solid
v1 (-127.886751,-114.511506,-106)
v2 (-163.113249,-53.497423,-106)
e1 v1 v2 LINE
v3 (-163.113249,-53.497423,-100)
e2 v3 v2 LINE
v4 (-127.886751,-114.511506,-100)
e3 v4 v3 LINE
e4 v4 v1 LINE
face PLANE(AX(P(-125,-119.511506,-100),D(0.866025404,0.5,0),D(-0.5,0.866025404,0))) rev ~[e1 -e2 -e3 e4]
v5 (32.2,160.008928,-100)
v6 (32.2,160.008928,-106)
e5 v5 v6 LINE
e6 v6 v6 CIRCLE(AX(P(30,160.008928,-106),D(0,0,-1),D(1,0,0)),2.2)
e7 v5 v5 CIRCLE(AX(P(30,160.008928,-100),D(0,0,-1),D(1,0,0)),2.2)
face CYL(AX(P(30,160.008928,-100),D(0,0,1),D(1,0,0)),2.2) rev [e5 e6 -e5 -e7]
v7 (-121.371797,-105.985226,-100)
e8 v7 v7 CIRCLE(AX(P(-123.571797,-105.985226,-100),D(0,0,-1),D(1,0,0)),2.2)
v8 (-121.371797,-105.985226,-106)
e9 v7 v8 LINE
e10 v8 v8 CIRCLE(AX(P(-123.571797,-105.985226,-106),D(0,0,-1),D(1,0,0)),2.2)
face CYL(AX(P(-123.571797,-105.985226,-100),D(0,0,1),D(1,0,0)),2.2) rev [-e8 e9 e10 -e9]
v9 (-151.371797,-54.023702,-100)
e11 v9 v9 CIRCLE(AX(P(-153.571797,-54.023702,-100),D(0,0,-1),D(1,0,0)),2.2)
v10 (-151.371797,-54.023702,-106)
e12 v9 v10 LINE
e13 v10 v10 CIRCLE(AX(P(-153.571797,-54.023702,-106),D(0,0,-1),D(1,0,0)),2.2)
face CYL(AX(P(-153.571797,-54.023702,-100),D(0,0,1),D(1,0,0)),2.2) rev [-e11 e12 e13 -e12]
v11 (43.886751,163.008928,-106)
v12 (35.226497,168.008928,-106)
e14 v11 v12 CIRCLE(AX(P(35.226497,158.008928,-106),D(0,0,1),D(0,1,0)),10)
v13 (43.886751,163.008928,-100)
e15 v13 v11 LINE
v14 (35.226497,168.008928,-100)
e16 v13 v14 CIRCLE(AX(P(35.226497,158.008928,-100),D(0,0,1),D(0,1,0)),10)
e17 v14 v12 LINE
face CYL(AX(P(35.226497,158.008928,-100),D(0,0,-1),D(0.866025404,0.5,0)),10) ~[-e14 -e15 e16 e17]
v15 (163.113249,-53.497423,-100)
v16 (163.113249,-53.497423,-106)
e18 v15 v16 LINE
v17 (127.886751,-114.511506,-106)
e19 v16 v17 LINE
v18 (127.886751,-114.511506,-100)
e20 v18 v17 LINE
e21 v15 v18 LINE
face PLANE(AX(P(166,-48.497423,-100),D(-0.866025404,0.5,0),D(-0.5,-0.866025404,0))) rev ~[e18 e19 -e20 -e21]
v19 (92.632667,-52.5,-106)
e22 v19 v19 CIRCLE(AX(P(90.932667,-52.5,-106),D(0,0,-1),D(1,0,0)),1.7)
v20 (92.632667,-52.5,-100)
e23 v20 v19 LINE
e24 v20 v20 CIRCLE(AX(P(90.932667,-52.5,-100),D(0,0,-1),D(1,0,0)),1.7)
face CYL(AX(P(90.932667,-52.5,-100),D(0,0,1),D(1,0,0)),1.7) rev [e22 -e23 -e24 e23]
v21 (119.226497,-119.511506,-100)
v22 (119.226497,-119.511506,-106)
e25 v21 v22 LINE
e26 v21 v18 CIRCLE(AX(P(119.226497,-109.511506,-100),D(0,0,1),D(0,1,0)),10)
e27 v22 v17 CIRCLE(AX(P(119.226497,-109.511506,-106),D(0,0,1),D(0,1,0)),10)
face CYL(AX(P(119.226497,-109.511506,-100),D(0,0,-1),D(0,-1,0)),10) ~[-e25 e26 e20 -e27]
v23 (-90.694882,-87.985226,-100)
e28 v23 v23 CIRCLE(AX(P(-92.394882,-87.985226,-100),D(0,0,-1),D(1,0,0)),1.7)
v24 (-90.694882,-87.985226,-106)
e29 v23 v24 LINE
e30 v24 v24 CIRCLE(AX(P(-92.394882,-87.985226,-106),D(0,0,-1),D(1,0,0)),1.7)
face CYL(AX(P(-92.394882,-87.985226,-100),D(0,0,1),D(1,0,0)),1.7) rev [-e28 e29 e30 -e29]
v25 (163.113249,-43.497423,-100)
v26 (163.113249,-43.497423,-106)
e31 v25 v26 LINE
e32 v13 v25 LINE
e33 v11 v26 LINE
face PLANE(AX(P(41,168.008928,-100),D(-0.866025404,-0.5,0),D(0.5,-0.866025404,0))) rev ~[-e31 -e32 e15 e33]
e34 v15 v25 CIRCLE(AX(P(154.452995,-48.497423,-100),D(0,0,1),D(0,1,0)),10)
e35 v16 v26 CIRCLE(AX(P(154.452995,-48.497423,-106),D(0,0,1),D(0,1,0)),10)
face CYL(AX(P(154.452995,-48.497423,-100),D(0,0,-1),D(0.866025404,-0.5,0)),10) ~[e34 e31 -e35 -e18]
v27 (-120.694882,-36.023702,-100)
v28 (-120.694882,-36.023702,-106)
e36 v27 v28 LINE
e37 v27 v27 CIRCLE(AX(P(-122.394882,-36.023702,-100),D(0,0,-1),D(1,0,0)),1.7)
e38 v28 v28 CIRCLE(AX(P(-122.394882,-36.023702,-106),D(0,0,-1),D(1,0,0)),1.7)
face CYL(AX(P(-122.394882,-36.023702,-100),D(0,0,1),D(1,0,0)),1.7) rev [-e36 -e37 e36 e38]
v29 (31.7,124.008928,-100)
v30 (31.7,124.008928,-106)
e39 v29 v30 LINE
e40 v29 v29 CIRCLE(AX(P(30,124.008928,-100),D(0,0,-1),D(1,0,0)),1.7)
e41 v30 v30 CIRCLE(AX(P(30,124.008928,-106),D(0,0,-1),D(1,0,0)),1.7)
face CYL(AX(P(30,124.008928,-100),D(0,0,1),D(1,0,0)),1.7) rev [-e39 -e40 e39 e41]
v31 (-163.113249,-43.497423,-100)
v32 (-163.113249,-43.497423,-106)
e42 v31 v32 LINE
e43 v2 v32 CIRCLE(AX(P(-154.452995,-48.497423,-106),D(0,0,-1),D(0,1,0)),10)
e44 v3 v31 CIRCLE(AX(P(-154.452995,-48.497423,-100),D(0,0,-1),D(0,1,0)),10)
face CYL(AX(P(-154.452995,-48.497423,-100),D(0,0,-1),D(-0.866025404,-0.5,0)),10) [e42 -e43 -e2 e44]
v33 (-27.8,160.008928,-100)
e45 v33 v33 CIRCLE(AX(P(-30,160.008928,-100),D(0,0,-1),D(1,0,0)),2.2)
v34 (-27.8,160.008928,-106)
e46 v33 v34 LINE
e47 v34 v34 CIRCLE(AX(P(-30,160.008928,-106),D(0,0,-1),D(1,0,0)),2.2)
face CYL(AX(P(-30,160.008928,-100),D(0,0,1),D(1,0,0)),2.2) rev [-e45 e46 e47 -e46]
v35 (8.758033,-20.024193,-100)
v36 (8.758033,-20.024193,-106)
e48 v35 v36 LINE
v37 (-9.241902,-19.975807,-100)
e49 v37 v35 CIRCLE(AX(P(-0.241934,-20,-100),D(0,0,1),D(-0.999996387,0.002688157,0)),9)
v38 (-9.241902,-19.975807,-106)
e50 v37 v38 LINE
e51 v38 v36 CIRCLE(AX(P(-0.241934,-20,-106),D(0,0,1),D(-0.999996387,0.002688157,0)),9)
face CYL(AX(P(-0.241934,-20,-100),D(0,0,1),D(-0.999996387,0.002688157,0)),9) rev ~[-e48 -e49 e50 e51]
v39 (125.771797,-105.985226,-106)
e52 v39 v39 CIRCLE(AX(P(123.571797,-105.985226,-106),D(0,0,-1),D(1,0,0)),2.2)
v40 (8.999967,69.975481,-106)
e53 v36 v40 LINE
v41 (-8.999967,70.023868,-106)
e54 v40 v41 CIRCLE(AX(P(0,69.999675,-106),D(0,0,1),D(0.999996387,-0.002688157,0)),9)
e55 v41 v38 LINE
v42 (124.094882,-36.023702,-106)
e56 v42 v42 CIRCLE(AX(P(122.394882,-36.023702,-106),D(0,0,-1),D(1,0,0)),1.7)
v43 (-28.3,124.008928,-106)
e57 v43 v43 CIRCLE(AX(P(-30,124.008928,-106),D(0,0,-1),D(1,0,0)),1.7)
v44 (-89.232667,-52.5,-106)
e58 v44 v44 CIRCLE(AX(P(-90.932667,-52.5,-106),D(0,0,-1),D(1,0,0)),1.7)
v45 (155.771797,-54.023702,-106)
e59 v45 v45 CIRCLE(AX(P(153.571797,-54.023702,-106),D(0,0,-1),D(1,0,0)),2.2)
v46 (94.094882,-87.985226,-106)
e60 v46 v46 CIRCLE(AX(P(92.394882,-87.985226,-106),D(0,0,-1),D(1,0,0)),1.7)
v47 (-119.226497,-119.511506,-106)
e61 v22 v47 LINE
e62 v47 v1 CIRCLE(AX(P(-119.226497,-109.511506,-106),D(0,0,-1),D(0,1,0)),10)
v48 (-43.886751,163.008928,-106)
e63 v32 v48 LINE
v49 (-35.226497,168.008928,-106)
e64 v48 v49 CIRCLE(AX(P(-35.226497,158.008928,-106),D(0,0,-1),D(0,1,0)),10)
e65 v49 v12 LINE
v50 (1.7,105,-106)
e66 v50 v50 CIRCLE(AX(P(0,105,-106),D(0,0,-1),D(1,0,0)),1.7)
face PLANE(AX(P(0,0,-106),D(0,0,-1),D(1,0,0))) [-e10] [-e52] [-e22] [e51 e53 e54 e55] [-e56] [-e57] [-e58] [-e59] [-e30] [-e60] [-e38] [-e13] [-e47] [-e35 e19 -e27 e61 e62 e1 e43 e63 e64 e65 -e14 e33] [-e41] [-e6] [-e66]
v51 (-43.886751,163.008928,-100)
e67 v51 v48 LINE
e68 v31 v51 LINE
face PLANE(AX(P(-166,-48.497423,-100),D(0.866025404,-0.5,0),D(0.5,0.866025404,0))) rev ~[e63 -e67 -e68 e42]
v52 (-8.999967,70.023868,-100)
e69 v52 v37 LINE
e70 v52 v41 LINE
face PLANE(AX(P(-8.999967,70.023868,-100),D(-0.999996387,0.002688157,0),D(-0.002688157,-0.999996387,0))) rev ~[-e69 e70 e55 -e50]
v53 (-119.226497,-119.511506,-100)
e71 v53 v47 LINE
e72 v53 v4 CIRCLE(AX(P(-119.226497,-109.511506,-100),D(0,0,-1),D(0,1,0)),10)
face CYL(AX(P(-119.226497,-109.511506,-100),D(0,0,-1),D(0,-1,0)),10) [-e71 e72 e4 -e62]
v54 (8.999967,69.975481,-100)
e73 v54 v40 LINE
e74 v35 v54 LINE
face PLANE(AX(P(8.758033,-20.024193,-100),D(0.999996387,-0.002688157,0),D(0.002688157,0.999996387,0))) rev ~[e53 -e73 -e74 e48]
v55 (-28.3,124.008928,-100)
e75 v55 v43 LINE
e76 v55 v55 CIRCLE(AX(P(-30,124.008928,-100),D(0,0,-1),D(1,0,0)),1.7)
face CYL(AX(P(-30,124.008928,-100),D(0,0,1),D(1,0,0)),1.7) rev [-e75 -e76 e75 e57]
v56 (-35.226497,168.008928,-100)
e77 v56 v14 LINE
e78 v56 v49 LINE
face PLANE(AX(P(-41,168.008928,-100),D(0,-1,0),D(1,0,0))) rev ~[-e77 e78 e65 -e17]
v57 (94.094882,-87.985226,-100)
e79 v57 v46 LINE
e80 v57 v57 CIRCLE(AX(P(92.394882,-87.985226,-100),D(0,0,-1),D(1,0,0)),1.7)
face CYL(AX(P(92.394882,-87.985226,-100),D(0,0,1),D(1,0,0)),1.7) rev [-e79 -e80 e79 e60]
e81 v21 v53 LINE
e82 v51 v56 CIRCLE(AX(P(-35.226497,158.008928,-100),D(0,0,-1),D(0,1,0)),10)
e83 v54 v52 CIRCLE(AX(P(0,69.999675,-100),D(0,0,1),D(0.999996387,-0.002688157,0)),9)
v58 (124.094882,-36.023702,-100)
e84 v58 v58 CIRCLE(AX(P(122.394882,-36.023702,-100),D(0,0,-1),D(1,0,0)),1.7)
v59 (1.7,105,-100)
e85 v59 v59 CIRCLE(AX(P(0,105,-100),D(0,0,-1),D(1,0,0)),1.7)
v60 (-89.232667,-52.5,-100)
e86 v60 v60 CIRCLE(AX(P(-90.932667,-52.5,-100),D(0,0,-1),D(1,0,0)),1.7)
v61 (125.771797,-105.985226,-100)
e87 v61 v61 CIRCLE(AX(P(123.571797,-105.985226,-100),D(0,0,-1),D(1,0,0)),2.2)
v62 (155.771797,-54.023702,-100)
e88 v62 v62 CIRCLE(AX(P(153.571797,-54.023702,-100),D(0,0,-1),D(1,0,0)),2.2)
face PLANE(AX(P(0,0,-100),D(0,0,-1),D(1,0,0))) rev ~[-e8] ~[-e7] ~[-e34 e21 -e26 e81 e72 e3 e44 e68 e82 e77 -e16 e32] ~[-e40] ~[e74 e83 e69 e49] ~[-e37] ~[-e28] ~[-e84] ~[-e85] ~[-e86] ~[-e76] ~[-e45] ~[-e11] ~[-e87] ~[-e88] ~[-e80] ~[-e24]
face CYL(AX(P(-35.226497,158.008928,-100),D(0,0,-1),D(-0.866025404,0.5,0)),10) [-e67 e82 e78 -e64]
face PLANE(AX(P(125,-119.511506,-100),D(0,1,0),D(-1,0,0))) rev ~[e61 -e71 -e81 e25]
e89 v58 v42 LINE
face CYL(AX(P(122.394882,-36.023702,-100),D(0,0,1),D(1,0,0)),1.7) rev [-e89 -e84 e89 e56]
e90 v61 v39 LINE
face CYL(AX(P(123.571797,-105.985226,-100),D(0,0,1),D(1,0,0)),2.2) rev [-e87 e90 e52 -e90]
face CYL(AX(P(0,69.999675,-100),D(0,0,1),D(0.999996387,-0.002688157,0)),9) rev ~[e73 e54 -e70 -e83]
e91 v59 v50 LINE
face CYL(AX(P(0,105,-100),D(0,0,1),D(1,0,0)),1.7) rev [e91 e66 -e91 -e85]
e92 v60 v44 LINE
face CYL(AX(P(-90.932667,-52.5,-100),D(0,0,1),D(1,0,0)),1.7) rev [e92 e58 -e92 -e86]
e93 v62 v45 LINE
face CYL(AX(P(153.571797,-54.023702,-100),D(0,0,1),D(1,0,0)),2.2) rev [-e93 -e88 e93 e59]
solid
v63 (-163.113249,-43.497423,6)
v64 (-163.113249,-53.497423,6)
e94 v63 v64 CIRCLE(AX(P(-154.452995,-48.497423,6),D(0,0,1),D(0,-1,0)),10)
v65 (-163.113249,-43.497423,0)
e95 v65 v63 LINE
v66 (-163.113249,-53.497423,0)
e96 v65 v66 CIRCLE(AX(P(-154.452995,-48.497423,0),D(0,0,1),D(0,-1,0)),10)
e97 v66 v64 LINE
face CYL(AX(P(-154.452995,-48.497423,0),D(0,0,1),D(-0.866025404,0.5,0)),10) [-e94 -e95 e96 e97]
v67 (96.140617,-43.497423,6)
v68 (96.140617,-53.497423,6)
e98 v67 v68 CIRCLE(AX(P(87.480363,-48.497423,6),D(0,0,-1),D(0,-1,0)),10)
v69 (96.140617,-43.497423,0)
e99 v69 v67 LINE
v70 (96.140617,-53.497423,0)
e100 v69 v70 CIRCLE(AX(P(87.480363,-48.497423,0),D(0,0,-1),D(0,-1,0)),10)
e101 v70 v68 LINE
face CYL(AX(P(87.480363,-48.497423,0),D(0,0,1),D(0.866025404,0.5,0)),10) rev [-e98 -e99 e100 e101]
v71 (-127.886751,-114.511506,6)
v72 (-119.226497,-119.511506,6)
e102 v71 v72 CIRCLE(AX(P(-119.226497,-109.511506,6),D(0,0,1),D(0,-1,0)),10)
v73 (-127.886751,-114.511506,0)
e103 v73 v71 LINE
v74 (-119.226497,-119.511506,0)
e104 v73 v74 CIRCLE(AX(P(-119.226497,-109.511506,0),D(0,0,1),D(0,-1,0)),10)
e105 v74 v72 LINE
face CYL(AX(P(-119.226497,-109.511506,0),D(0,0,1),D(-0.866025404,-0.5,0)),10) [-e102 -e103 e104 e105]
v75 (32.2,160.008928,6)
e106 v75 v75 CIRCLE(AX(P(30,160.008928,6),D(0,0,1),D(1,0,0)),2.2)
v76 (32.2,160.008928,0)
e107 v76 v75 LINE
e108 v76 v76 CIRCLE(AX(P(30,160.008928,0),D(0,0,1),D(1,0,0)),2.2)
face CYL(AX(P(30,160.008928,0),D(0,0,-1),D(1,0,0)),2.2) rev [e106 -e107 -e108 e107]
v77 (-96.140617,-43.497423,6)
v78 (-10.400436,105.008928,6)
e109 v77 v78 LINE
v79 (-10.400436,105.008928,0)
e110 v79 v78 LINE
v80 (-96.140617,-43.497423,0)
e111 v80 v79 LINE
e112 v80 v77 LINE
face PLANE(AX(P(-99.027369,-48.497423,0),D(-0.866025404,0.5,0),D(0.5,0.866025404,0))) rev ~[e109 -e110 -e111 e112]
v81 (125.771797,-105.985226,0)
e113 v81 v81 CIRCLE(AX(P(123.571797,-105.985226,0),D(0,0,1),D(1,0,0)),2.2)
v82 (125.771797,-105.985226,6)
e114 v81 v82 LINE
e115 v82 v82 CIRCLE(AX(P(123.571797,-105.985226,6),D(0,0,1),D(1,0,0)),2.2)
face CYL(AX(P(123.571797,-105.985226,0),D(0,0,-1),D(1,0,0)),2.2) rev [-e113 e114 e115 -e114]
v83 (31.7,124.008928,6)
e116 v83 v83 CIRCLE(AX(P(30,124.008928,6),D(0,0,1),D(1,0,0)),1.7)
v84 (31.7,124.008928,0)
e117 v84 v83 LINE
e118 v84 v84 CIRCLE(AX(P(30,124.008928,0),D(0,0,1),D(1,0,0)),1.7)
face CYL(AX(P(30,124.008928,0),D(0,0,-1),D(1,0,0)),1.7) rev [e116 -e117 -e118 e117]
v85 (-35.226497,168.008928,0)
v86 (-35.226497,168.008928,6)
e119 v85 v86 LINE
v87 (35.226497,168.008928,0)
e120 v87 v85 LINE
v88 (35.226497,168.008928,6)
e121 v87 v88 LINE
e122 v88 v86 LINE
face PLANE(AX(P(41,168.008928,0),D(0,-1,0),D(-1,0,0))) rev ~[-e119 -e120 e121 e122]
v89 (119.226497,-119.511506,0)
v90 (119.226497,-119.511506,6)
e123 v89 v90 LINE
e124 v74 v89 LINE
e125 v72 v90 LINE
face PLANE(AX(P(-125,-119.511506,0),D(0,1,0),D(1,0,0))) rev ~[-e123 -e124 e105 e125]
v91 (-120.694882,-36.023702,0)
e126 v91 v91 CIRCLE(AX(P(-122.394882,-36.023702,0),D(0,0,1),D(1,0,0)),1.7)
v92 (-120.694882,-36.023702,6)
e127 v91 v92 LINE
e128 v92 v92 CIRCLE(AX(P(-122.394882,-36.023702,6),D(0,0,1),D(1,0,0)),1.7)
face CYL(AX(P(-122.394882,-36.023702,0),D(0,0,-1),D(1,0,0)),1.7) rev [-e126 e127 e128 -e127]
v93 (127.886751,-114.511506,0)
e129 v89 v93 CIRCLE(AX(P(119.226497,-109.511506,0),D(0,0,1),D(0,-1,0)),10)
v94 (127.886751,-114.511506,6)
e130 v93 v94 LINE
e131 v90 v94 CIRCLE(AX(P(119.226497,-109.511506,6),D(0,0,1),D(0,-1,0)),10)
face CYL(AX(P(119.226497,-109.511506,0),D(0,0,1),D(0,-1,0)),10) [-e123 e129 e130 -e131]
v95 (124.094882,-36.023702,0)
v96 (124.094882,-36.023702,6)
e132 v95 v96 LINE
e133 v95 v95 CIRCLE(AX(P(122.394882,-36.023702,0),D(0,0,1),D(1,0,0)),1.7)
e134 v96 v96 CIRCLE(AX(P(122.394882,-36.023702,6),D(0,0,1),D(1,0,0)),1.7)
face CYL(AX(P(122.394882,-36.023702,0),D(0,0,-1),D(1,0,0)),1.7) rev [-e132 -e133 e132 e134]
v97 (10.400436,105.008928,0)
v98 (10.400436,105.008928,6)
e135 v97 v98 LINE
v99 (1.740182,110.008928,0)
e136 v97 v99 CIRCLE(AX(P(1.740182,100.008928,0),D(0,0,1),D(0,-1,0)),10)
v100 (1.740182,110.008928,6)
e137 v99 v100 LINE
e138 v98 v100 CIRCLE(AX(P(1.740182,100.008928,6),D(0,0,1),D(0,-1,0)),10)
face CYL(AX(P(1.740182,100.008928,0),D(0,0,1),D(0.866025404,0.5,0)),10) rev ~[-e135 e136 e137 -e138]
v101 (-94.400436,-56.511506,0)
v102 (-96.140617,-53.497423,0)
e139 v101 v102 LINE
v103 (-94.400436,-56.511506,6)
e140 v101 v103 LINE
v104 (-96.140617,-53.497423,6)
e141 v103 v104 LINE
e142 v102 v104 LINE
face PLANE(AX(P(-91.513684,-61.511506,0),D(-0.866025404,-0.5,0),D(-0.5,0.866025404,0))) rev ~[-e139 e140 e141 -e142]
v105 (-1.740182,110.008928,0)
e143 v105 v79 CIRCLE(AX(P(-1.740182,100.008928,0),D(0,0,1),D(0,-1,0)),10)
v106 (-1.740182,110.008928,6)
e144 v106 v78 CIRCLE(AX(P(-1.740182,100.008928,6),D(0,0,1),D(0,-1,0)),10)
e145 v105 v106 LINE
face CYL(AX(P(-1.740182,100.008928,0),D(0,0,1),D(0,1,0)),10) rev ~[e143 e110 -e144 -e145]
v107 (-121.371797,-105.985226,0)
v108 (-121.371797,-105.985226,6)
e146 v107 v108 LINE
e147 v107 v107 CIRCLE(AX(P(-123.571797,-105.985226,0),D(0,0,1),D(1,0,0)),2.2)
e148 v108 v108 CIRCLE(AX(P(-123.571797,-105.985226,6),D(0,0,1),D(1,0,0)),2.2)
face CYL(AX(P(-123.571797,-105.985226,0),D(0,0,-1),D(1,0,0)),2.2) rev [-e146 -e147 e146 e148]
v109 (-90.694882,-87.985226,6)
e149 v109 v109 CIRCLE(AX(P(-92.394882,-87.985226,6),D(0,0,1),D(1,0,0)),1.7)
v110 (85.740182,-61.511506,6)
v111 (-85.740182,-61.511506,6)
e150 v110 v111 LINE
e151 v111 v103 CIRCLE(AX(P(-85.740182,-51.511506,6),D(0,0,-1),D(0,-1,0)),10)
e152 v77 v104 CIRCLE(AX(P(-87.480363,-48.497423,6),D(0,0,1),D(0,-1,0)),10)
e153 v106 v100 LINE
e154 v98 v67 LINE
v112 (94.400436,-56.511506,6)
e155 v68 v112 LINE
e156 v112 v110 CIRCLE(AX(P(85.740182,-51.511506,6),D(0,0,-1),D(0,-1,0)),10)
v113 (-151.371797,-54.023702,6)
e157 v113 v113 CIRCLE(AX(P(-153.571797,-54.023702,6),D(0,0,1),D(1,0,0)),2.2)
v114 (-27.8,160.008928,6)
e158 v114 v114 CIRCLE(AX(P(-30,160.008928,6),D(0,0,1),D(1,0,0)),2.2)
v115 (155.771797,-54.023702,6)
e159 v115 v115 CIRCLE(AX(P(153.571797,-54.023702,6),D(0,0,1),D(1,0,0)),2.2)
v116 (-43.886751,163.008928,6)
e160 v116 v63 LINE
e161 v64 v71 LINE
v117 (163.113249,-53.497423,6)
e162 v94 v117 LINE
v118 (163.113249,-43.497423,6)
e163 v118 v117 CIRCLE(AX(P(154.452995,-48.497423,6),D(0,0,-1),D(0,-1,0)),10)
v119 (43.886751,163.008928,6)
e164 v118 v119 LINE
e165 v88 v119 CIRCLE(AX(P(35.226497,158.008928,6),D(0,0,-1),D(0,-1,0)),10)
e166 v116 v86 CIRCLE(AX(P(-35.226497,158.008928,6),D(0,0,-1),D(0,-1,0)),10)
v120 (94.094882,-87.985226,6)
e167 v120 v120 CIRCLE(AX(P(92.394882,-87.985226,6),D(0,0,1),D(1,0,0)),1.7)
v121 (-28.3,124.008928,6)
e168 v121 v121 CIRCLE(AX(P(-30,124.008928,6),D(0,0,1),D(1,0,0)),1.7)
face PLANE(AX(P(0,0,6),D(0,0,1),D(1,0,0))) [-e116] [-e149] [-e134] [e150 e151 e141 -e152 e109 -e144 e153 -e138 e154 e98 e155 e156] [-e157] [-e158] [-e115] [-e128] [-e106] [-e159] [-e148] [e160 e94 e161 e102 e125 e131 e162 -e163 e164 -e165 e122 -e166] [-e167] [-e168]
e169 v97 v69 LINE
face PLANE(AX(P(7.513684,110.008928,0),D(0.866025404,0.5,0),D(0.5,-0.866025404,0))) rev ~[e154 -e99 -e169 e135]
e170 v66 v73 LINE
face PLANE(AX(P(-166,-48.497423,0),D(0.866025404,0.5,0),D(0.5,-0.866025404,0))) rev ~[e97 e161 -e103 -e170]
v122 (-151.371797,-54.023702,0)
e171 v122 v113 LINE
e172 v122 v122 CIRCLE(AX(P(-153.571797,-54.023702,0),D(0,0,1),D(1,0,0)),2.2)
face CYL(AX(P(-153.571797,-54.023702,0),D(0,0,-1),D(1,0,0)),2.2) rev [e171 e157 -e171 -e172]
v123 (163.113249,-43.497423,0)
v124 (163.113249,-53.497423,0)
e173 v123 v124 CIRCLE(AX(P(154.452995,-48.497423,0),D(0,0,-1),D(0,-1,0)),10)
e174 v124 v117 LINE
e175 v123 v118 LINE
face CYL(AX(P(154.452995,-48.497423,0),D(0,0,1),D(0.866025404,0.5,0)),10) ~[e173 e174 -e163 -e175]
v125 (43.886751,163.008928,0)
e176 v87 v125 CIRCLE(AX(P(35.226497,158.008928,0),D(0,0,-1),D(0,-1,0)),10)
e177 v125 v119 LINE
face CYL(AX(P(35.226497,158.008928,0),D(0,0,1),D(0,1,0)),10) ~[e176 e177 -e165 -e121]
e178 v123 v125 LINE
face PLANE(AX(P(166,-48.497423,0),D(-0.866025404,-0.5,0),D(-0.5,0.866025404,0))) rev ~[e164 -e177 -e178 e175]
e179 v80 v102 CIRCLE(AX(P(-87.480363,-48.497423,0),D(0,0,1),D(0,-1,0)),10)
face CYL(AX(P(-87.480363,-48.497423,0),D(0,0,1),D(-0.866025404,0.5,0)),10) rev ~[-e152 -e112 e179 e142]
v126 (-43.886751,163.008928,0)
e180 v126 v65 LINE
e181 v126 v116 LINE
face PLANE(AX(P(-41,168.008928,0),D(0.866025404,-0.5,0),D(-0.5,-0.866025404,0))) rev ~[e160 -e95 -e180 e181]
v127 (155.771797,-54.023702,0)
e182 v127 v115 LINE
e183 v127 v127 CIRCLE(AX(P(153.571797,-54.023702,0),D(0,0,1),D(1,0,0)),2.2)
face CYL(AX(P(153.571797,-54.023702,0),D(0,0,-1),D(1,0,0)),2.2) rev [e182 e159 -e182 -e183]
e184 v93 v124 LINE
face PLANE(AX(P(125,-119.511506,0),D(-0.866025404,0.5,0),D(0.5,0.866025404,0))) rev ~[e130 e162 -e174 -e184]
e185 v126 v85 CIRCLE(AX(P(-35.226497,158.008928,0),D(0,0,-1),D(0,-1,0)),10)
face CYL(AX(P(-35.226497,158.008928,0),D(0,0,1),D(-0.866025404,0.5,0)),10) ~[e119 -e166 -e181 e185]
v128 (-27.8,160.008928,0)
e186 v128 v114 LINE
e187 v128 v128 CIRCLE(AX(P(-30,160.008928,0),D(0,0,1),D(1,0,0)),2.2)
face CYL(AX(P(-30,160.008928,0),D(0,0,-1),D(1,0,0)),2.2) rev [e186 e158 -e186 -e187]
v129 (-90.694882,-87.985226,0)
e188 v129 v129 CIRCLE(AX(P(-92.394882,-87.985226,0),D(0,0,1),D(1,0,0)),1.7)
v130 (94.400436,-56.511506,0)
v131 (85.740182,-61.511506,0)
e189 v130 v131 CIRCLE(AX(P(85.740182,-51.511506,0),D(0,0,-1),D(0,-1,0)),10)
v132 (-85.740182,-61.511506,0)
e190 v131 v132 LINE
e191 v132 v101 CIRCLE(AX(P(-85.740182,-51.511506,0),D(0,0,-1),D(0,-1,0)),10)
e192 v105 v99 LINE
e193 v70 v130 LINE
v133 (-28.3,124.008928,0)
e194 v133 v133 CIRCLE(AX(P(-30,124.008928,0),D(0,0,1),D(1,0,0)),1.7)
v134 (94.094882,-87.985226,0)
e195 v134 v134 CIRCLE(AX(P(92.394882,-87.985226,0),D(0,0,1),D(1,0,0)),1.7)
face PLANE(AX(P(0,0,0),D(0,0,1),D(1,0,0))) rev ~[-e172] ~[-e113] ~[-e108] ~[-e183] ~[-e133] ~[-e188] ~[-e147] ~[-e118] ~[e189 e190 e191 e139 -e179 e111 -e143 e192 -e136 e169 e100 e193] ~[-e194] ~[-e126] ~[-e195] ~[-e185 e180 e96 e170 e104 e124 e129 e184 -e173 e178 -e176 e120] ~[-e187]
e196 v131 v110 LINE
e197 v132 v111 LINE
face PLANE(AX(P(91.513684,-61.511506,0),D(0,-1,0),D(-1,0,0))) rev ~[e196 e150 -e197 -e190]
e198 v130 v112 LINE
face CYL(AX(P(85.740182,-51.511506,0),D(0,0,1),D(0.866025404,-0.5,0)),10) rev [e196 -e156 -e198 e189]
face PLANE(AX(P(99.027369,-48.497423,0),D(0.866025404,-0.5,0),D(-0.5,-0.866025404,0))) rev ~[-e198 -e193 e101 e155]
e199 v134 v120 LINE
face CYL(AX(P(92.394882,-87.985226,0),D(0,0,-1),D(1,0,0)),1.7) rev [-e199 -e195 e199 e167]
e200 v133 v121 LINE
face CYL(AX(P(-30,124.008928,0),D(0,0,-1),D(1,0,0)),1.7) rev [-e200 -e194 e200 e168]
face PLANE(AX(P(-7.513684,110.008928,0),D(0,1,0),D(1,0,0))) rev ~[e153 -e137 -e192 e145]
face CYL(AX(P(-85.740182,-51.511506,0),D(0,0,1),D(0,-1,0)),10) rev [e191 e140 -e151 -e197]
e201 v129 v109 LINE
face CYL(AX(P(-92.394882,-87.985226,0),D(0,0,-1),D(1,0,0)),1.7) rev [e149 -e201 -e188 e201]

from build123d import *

# Parameters (mm, degrees)
F0_R     = 2.2
F0_R_2   = 1.7
F1_DEPTH = 6
F3_R     = 2.2
F3_R_2   = 1.7
F4_DEPTH = 6
F5_R     = 10
F5_2_R   = 10


# Not quite as in the source:
# - a feature names something its author has since deleted; it is built from what else it names


with BuildPart() as f1:
    # F0 (on Top) → F1 (new body)
    with BuildSketch(Plane.XY):
        Polygon((-41, 168.0089283342), (-166, -48.4974226119), (-125, -119.5115057223), (125, -119.5115057223), (166, -48.4974226119), (41, 168.0089283342), align=None)
        with Locations((-123.5717967697, -105.9852262806)):
            Circle(F0_R, mode=Mode.SUBTRACT)
        with Locations((-92.3948822335, -87.9852262806)):
            Circle(F0_R_2, mode=Mode.SUBTRACT)
        with Locations((-153.5717967697, -54.0237020536)):
            Circle(F0_R, mode=Mode.SUBTRACT)
        with Locations((-122.3948822335, -36.0237020536)):
            Circle(F0_R_2, mode=Mode.SUBTRACT)
        Polygon((99.027368774, -48.4974226119), (91.513684387, -61.5115057223), (-91.513684387, -61.5115057223), (-99.027368774, -48.4974226119), (-7.513684387, 110.0089283342), (7.513684387, 110.0089283342), align=None, mode=Mode.SUBTRACT)
        with Locations((123.5717967697, -105.9852262806)):
            Circle(F0_R, mode=Mode.SUBTRACT)
        with Locations((92.3948822335, -87.9852262806)):
            Circle(F0_R_2, mode=Mode.SUBTRACT)
        with Locations((153.5717967697, -54.0237020536)):
            Circle(F0_R, mode=Mode.SUBTRACT)
        with Locations((122.3948822335, -36.0237020536)):
            Circle(F0_R_2, mode=Mode.SUBTRACT)
        with Locations((-30, 124.0089283342)):
            Circle(F0_R_2, mode=Mode.SUBTRACT)
        with Locations((-30, 160.0089283342)):
            Circle(F0_R, mode=Mode.SUBTRACT)
        with Locations((30, 124.0089283342)):
            Circle(F0_R_2, mode=Mode.SUBTRACT)
        with Locations((30, 160.0089283342)):
            Circle(F0_R, mode=Mode.SUBTRACT)
    extrude(amount=F1_DEPTH)

    # F5
    f5_edges = [f1.edges().sort_by_distance(p)[0] for p in [
        (-125, -119.511506, 3),
        (-166, -48.497423, 3),
        (125, -119.511506, 3),
        (166, -48.497423, 3),
        (-41, 168.008928, 3),
        (41, 168.008928, 3),
        (-99.027369, -48.497423, 3),
        (-91.513684, -61.511506, 3),
        (-7.513684, 110.008928, 3),
        (7.513684, 110.008928, 3),
        (99.027369, -48.497423, 3),
        (91.513684, -61.511506, 3),
    ]]
    fillet(f5_edges, radius=F5_R)


with BuildPart() as f4:
    # F3 (on offset) → F4 (new body)
    with BuildSketch(Plane(origin=(0, 0, -100), x_dir=(1, 0, 0), z_dir=(0, 0, -1))):
        Polygon((125, 119.5115057223), (-125, 119.5115057223), (-166, 48.4974226119), (-41, -168.0089283342), (41, -168.0089283342), (166, 48.4974226119), align=None)
        with Locations((-30, -160.0089283342)):
            Circle(F3_R, mode=Mode.SUBTRACT)
        with Locations((-30, -124.0089283342)):
            Circle(F3_R_2, mode=Mode.SUBTRACT)
        with BuildLine():
            Line((8.7580333745, 20.0241934108), (8.9999674821, -69.9754814103))
            ThreePointArc((8.9999674821, -69.9754814103), (0.0241934108, -78.9996423031), (-8.9999674821, -70.0238682318))
            Line((-8.9999674821, -70.0238682318), (-9.2419015897, 19.9758065892))
            ThreePointArc((-9.2419015897, 19.9758065892), (-0.2661275183, 28.9999674821), (8.7580333745, 20.0241934108))
        make_face(mode=Mode.SUBTRACT)
        with Locations((30, -160.0089283342)):
            Circle(F3_R, mode=Mode.SUBTRACT)
        with Locations((30, -124.0089283342)):
            Circle(F3_R_2, mode=Mode.SUBTRACT)
        with Locations((0, -105)):
            Circle(F3_R_2, mode=Mode.SUBTRACT)
        with Locations((-122.3948822335, 36.0237020536)):
            Circle(F3_R_2, mode=Mode.SUBTRACT)
        with Locations((-153.5717967697, 54.0237020536)):
            Circle(F3_R, mode=Mode.SUBTRACT)
        with Locations((-90.9326673974, 52.5)):
            Circle(F3_R_2, mode=Mode.SUBTRACT)
        with Locations((-92.3948822335, 87.9852262806)):
            Circle(F3_R_2, mode=Mode.SUBTRACT)
        with Locations((-123.5717967697, 105.9852262806)):
            Circle(F3_R, mode=Mode.SUBTRACT)
        with Locations((122.3948822335, 36.0237020536)):
            Circle(F3_R_2, mode=Mode.SUBTRACT)
        with Locations((90.9326673974, 52.5)):
            Circle(F3_R_2, mode=Mode.SUBTRACT)
        with Locations((153.5717967697, 54.0237020536)):
            Circle(F3_R, mode=Mode.SUBTRACT)
        with Locations((92.3948822335, 87.9852262806)):
            Circle(F3_R_2, mode=Mode.SUBTRACT)
        with Locations((123.5717967697, 105.9852262806)):
            Circle(F3_R, mode=Mode.SUBTRACT)
    extrude(amount=F4_DEPTH)

    # F5#2
    f5_2_edges = [f4.edges().sort_by_distance(p)[0] for p in [
        (125, -119.511506, -103),
        (166, -48.497423, -103),
        (-125, -119.511506, -103),
        (-166, -48.497423, -103),
        (-41, 168.008928, -103),
        (41, 168.008928, -103),
    ]]
    fillet(f5_2_edges, radius=F5_2_R)


solid = Compound([f1.part, f4.part])
